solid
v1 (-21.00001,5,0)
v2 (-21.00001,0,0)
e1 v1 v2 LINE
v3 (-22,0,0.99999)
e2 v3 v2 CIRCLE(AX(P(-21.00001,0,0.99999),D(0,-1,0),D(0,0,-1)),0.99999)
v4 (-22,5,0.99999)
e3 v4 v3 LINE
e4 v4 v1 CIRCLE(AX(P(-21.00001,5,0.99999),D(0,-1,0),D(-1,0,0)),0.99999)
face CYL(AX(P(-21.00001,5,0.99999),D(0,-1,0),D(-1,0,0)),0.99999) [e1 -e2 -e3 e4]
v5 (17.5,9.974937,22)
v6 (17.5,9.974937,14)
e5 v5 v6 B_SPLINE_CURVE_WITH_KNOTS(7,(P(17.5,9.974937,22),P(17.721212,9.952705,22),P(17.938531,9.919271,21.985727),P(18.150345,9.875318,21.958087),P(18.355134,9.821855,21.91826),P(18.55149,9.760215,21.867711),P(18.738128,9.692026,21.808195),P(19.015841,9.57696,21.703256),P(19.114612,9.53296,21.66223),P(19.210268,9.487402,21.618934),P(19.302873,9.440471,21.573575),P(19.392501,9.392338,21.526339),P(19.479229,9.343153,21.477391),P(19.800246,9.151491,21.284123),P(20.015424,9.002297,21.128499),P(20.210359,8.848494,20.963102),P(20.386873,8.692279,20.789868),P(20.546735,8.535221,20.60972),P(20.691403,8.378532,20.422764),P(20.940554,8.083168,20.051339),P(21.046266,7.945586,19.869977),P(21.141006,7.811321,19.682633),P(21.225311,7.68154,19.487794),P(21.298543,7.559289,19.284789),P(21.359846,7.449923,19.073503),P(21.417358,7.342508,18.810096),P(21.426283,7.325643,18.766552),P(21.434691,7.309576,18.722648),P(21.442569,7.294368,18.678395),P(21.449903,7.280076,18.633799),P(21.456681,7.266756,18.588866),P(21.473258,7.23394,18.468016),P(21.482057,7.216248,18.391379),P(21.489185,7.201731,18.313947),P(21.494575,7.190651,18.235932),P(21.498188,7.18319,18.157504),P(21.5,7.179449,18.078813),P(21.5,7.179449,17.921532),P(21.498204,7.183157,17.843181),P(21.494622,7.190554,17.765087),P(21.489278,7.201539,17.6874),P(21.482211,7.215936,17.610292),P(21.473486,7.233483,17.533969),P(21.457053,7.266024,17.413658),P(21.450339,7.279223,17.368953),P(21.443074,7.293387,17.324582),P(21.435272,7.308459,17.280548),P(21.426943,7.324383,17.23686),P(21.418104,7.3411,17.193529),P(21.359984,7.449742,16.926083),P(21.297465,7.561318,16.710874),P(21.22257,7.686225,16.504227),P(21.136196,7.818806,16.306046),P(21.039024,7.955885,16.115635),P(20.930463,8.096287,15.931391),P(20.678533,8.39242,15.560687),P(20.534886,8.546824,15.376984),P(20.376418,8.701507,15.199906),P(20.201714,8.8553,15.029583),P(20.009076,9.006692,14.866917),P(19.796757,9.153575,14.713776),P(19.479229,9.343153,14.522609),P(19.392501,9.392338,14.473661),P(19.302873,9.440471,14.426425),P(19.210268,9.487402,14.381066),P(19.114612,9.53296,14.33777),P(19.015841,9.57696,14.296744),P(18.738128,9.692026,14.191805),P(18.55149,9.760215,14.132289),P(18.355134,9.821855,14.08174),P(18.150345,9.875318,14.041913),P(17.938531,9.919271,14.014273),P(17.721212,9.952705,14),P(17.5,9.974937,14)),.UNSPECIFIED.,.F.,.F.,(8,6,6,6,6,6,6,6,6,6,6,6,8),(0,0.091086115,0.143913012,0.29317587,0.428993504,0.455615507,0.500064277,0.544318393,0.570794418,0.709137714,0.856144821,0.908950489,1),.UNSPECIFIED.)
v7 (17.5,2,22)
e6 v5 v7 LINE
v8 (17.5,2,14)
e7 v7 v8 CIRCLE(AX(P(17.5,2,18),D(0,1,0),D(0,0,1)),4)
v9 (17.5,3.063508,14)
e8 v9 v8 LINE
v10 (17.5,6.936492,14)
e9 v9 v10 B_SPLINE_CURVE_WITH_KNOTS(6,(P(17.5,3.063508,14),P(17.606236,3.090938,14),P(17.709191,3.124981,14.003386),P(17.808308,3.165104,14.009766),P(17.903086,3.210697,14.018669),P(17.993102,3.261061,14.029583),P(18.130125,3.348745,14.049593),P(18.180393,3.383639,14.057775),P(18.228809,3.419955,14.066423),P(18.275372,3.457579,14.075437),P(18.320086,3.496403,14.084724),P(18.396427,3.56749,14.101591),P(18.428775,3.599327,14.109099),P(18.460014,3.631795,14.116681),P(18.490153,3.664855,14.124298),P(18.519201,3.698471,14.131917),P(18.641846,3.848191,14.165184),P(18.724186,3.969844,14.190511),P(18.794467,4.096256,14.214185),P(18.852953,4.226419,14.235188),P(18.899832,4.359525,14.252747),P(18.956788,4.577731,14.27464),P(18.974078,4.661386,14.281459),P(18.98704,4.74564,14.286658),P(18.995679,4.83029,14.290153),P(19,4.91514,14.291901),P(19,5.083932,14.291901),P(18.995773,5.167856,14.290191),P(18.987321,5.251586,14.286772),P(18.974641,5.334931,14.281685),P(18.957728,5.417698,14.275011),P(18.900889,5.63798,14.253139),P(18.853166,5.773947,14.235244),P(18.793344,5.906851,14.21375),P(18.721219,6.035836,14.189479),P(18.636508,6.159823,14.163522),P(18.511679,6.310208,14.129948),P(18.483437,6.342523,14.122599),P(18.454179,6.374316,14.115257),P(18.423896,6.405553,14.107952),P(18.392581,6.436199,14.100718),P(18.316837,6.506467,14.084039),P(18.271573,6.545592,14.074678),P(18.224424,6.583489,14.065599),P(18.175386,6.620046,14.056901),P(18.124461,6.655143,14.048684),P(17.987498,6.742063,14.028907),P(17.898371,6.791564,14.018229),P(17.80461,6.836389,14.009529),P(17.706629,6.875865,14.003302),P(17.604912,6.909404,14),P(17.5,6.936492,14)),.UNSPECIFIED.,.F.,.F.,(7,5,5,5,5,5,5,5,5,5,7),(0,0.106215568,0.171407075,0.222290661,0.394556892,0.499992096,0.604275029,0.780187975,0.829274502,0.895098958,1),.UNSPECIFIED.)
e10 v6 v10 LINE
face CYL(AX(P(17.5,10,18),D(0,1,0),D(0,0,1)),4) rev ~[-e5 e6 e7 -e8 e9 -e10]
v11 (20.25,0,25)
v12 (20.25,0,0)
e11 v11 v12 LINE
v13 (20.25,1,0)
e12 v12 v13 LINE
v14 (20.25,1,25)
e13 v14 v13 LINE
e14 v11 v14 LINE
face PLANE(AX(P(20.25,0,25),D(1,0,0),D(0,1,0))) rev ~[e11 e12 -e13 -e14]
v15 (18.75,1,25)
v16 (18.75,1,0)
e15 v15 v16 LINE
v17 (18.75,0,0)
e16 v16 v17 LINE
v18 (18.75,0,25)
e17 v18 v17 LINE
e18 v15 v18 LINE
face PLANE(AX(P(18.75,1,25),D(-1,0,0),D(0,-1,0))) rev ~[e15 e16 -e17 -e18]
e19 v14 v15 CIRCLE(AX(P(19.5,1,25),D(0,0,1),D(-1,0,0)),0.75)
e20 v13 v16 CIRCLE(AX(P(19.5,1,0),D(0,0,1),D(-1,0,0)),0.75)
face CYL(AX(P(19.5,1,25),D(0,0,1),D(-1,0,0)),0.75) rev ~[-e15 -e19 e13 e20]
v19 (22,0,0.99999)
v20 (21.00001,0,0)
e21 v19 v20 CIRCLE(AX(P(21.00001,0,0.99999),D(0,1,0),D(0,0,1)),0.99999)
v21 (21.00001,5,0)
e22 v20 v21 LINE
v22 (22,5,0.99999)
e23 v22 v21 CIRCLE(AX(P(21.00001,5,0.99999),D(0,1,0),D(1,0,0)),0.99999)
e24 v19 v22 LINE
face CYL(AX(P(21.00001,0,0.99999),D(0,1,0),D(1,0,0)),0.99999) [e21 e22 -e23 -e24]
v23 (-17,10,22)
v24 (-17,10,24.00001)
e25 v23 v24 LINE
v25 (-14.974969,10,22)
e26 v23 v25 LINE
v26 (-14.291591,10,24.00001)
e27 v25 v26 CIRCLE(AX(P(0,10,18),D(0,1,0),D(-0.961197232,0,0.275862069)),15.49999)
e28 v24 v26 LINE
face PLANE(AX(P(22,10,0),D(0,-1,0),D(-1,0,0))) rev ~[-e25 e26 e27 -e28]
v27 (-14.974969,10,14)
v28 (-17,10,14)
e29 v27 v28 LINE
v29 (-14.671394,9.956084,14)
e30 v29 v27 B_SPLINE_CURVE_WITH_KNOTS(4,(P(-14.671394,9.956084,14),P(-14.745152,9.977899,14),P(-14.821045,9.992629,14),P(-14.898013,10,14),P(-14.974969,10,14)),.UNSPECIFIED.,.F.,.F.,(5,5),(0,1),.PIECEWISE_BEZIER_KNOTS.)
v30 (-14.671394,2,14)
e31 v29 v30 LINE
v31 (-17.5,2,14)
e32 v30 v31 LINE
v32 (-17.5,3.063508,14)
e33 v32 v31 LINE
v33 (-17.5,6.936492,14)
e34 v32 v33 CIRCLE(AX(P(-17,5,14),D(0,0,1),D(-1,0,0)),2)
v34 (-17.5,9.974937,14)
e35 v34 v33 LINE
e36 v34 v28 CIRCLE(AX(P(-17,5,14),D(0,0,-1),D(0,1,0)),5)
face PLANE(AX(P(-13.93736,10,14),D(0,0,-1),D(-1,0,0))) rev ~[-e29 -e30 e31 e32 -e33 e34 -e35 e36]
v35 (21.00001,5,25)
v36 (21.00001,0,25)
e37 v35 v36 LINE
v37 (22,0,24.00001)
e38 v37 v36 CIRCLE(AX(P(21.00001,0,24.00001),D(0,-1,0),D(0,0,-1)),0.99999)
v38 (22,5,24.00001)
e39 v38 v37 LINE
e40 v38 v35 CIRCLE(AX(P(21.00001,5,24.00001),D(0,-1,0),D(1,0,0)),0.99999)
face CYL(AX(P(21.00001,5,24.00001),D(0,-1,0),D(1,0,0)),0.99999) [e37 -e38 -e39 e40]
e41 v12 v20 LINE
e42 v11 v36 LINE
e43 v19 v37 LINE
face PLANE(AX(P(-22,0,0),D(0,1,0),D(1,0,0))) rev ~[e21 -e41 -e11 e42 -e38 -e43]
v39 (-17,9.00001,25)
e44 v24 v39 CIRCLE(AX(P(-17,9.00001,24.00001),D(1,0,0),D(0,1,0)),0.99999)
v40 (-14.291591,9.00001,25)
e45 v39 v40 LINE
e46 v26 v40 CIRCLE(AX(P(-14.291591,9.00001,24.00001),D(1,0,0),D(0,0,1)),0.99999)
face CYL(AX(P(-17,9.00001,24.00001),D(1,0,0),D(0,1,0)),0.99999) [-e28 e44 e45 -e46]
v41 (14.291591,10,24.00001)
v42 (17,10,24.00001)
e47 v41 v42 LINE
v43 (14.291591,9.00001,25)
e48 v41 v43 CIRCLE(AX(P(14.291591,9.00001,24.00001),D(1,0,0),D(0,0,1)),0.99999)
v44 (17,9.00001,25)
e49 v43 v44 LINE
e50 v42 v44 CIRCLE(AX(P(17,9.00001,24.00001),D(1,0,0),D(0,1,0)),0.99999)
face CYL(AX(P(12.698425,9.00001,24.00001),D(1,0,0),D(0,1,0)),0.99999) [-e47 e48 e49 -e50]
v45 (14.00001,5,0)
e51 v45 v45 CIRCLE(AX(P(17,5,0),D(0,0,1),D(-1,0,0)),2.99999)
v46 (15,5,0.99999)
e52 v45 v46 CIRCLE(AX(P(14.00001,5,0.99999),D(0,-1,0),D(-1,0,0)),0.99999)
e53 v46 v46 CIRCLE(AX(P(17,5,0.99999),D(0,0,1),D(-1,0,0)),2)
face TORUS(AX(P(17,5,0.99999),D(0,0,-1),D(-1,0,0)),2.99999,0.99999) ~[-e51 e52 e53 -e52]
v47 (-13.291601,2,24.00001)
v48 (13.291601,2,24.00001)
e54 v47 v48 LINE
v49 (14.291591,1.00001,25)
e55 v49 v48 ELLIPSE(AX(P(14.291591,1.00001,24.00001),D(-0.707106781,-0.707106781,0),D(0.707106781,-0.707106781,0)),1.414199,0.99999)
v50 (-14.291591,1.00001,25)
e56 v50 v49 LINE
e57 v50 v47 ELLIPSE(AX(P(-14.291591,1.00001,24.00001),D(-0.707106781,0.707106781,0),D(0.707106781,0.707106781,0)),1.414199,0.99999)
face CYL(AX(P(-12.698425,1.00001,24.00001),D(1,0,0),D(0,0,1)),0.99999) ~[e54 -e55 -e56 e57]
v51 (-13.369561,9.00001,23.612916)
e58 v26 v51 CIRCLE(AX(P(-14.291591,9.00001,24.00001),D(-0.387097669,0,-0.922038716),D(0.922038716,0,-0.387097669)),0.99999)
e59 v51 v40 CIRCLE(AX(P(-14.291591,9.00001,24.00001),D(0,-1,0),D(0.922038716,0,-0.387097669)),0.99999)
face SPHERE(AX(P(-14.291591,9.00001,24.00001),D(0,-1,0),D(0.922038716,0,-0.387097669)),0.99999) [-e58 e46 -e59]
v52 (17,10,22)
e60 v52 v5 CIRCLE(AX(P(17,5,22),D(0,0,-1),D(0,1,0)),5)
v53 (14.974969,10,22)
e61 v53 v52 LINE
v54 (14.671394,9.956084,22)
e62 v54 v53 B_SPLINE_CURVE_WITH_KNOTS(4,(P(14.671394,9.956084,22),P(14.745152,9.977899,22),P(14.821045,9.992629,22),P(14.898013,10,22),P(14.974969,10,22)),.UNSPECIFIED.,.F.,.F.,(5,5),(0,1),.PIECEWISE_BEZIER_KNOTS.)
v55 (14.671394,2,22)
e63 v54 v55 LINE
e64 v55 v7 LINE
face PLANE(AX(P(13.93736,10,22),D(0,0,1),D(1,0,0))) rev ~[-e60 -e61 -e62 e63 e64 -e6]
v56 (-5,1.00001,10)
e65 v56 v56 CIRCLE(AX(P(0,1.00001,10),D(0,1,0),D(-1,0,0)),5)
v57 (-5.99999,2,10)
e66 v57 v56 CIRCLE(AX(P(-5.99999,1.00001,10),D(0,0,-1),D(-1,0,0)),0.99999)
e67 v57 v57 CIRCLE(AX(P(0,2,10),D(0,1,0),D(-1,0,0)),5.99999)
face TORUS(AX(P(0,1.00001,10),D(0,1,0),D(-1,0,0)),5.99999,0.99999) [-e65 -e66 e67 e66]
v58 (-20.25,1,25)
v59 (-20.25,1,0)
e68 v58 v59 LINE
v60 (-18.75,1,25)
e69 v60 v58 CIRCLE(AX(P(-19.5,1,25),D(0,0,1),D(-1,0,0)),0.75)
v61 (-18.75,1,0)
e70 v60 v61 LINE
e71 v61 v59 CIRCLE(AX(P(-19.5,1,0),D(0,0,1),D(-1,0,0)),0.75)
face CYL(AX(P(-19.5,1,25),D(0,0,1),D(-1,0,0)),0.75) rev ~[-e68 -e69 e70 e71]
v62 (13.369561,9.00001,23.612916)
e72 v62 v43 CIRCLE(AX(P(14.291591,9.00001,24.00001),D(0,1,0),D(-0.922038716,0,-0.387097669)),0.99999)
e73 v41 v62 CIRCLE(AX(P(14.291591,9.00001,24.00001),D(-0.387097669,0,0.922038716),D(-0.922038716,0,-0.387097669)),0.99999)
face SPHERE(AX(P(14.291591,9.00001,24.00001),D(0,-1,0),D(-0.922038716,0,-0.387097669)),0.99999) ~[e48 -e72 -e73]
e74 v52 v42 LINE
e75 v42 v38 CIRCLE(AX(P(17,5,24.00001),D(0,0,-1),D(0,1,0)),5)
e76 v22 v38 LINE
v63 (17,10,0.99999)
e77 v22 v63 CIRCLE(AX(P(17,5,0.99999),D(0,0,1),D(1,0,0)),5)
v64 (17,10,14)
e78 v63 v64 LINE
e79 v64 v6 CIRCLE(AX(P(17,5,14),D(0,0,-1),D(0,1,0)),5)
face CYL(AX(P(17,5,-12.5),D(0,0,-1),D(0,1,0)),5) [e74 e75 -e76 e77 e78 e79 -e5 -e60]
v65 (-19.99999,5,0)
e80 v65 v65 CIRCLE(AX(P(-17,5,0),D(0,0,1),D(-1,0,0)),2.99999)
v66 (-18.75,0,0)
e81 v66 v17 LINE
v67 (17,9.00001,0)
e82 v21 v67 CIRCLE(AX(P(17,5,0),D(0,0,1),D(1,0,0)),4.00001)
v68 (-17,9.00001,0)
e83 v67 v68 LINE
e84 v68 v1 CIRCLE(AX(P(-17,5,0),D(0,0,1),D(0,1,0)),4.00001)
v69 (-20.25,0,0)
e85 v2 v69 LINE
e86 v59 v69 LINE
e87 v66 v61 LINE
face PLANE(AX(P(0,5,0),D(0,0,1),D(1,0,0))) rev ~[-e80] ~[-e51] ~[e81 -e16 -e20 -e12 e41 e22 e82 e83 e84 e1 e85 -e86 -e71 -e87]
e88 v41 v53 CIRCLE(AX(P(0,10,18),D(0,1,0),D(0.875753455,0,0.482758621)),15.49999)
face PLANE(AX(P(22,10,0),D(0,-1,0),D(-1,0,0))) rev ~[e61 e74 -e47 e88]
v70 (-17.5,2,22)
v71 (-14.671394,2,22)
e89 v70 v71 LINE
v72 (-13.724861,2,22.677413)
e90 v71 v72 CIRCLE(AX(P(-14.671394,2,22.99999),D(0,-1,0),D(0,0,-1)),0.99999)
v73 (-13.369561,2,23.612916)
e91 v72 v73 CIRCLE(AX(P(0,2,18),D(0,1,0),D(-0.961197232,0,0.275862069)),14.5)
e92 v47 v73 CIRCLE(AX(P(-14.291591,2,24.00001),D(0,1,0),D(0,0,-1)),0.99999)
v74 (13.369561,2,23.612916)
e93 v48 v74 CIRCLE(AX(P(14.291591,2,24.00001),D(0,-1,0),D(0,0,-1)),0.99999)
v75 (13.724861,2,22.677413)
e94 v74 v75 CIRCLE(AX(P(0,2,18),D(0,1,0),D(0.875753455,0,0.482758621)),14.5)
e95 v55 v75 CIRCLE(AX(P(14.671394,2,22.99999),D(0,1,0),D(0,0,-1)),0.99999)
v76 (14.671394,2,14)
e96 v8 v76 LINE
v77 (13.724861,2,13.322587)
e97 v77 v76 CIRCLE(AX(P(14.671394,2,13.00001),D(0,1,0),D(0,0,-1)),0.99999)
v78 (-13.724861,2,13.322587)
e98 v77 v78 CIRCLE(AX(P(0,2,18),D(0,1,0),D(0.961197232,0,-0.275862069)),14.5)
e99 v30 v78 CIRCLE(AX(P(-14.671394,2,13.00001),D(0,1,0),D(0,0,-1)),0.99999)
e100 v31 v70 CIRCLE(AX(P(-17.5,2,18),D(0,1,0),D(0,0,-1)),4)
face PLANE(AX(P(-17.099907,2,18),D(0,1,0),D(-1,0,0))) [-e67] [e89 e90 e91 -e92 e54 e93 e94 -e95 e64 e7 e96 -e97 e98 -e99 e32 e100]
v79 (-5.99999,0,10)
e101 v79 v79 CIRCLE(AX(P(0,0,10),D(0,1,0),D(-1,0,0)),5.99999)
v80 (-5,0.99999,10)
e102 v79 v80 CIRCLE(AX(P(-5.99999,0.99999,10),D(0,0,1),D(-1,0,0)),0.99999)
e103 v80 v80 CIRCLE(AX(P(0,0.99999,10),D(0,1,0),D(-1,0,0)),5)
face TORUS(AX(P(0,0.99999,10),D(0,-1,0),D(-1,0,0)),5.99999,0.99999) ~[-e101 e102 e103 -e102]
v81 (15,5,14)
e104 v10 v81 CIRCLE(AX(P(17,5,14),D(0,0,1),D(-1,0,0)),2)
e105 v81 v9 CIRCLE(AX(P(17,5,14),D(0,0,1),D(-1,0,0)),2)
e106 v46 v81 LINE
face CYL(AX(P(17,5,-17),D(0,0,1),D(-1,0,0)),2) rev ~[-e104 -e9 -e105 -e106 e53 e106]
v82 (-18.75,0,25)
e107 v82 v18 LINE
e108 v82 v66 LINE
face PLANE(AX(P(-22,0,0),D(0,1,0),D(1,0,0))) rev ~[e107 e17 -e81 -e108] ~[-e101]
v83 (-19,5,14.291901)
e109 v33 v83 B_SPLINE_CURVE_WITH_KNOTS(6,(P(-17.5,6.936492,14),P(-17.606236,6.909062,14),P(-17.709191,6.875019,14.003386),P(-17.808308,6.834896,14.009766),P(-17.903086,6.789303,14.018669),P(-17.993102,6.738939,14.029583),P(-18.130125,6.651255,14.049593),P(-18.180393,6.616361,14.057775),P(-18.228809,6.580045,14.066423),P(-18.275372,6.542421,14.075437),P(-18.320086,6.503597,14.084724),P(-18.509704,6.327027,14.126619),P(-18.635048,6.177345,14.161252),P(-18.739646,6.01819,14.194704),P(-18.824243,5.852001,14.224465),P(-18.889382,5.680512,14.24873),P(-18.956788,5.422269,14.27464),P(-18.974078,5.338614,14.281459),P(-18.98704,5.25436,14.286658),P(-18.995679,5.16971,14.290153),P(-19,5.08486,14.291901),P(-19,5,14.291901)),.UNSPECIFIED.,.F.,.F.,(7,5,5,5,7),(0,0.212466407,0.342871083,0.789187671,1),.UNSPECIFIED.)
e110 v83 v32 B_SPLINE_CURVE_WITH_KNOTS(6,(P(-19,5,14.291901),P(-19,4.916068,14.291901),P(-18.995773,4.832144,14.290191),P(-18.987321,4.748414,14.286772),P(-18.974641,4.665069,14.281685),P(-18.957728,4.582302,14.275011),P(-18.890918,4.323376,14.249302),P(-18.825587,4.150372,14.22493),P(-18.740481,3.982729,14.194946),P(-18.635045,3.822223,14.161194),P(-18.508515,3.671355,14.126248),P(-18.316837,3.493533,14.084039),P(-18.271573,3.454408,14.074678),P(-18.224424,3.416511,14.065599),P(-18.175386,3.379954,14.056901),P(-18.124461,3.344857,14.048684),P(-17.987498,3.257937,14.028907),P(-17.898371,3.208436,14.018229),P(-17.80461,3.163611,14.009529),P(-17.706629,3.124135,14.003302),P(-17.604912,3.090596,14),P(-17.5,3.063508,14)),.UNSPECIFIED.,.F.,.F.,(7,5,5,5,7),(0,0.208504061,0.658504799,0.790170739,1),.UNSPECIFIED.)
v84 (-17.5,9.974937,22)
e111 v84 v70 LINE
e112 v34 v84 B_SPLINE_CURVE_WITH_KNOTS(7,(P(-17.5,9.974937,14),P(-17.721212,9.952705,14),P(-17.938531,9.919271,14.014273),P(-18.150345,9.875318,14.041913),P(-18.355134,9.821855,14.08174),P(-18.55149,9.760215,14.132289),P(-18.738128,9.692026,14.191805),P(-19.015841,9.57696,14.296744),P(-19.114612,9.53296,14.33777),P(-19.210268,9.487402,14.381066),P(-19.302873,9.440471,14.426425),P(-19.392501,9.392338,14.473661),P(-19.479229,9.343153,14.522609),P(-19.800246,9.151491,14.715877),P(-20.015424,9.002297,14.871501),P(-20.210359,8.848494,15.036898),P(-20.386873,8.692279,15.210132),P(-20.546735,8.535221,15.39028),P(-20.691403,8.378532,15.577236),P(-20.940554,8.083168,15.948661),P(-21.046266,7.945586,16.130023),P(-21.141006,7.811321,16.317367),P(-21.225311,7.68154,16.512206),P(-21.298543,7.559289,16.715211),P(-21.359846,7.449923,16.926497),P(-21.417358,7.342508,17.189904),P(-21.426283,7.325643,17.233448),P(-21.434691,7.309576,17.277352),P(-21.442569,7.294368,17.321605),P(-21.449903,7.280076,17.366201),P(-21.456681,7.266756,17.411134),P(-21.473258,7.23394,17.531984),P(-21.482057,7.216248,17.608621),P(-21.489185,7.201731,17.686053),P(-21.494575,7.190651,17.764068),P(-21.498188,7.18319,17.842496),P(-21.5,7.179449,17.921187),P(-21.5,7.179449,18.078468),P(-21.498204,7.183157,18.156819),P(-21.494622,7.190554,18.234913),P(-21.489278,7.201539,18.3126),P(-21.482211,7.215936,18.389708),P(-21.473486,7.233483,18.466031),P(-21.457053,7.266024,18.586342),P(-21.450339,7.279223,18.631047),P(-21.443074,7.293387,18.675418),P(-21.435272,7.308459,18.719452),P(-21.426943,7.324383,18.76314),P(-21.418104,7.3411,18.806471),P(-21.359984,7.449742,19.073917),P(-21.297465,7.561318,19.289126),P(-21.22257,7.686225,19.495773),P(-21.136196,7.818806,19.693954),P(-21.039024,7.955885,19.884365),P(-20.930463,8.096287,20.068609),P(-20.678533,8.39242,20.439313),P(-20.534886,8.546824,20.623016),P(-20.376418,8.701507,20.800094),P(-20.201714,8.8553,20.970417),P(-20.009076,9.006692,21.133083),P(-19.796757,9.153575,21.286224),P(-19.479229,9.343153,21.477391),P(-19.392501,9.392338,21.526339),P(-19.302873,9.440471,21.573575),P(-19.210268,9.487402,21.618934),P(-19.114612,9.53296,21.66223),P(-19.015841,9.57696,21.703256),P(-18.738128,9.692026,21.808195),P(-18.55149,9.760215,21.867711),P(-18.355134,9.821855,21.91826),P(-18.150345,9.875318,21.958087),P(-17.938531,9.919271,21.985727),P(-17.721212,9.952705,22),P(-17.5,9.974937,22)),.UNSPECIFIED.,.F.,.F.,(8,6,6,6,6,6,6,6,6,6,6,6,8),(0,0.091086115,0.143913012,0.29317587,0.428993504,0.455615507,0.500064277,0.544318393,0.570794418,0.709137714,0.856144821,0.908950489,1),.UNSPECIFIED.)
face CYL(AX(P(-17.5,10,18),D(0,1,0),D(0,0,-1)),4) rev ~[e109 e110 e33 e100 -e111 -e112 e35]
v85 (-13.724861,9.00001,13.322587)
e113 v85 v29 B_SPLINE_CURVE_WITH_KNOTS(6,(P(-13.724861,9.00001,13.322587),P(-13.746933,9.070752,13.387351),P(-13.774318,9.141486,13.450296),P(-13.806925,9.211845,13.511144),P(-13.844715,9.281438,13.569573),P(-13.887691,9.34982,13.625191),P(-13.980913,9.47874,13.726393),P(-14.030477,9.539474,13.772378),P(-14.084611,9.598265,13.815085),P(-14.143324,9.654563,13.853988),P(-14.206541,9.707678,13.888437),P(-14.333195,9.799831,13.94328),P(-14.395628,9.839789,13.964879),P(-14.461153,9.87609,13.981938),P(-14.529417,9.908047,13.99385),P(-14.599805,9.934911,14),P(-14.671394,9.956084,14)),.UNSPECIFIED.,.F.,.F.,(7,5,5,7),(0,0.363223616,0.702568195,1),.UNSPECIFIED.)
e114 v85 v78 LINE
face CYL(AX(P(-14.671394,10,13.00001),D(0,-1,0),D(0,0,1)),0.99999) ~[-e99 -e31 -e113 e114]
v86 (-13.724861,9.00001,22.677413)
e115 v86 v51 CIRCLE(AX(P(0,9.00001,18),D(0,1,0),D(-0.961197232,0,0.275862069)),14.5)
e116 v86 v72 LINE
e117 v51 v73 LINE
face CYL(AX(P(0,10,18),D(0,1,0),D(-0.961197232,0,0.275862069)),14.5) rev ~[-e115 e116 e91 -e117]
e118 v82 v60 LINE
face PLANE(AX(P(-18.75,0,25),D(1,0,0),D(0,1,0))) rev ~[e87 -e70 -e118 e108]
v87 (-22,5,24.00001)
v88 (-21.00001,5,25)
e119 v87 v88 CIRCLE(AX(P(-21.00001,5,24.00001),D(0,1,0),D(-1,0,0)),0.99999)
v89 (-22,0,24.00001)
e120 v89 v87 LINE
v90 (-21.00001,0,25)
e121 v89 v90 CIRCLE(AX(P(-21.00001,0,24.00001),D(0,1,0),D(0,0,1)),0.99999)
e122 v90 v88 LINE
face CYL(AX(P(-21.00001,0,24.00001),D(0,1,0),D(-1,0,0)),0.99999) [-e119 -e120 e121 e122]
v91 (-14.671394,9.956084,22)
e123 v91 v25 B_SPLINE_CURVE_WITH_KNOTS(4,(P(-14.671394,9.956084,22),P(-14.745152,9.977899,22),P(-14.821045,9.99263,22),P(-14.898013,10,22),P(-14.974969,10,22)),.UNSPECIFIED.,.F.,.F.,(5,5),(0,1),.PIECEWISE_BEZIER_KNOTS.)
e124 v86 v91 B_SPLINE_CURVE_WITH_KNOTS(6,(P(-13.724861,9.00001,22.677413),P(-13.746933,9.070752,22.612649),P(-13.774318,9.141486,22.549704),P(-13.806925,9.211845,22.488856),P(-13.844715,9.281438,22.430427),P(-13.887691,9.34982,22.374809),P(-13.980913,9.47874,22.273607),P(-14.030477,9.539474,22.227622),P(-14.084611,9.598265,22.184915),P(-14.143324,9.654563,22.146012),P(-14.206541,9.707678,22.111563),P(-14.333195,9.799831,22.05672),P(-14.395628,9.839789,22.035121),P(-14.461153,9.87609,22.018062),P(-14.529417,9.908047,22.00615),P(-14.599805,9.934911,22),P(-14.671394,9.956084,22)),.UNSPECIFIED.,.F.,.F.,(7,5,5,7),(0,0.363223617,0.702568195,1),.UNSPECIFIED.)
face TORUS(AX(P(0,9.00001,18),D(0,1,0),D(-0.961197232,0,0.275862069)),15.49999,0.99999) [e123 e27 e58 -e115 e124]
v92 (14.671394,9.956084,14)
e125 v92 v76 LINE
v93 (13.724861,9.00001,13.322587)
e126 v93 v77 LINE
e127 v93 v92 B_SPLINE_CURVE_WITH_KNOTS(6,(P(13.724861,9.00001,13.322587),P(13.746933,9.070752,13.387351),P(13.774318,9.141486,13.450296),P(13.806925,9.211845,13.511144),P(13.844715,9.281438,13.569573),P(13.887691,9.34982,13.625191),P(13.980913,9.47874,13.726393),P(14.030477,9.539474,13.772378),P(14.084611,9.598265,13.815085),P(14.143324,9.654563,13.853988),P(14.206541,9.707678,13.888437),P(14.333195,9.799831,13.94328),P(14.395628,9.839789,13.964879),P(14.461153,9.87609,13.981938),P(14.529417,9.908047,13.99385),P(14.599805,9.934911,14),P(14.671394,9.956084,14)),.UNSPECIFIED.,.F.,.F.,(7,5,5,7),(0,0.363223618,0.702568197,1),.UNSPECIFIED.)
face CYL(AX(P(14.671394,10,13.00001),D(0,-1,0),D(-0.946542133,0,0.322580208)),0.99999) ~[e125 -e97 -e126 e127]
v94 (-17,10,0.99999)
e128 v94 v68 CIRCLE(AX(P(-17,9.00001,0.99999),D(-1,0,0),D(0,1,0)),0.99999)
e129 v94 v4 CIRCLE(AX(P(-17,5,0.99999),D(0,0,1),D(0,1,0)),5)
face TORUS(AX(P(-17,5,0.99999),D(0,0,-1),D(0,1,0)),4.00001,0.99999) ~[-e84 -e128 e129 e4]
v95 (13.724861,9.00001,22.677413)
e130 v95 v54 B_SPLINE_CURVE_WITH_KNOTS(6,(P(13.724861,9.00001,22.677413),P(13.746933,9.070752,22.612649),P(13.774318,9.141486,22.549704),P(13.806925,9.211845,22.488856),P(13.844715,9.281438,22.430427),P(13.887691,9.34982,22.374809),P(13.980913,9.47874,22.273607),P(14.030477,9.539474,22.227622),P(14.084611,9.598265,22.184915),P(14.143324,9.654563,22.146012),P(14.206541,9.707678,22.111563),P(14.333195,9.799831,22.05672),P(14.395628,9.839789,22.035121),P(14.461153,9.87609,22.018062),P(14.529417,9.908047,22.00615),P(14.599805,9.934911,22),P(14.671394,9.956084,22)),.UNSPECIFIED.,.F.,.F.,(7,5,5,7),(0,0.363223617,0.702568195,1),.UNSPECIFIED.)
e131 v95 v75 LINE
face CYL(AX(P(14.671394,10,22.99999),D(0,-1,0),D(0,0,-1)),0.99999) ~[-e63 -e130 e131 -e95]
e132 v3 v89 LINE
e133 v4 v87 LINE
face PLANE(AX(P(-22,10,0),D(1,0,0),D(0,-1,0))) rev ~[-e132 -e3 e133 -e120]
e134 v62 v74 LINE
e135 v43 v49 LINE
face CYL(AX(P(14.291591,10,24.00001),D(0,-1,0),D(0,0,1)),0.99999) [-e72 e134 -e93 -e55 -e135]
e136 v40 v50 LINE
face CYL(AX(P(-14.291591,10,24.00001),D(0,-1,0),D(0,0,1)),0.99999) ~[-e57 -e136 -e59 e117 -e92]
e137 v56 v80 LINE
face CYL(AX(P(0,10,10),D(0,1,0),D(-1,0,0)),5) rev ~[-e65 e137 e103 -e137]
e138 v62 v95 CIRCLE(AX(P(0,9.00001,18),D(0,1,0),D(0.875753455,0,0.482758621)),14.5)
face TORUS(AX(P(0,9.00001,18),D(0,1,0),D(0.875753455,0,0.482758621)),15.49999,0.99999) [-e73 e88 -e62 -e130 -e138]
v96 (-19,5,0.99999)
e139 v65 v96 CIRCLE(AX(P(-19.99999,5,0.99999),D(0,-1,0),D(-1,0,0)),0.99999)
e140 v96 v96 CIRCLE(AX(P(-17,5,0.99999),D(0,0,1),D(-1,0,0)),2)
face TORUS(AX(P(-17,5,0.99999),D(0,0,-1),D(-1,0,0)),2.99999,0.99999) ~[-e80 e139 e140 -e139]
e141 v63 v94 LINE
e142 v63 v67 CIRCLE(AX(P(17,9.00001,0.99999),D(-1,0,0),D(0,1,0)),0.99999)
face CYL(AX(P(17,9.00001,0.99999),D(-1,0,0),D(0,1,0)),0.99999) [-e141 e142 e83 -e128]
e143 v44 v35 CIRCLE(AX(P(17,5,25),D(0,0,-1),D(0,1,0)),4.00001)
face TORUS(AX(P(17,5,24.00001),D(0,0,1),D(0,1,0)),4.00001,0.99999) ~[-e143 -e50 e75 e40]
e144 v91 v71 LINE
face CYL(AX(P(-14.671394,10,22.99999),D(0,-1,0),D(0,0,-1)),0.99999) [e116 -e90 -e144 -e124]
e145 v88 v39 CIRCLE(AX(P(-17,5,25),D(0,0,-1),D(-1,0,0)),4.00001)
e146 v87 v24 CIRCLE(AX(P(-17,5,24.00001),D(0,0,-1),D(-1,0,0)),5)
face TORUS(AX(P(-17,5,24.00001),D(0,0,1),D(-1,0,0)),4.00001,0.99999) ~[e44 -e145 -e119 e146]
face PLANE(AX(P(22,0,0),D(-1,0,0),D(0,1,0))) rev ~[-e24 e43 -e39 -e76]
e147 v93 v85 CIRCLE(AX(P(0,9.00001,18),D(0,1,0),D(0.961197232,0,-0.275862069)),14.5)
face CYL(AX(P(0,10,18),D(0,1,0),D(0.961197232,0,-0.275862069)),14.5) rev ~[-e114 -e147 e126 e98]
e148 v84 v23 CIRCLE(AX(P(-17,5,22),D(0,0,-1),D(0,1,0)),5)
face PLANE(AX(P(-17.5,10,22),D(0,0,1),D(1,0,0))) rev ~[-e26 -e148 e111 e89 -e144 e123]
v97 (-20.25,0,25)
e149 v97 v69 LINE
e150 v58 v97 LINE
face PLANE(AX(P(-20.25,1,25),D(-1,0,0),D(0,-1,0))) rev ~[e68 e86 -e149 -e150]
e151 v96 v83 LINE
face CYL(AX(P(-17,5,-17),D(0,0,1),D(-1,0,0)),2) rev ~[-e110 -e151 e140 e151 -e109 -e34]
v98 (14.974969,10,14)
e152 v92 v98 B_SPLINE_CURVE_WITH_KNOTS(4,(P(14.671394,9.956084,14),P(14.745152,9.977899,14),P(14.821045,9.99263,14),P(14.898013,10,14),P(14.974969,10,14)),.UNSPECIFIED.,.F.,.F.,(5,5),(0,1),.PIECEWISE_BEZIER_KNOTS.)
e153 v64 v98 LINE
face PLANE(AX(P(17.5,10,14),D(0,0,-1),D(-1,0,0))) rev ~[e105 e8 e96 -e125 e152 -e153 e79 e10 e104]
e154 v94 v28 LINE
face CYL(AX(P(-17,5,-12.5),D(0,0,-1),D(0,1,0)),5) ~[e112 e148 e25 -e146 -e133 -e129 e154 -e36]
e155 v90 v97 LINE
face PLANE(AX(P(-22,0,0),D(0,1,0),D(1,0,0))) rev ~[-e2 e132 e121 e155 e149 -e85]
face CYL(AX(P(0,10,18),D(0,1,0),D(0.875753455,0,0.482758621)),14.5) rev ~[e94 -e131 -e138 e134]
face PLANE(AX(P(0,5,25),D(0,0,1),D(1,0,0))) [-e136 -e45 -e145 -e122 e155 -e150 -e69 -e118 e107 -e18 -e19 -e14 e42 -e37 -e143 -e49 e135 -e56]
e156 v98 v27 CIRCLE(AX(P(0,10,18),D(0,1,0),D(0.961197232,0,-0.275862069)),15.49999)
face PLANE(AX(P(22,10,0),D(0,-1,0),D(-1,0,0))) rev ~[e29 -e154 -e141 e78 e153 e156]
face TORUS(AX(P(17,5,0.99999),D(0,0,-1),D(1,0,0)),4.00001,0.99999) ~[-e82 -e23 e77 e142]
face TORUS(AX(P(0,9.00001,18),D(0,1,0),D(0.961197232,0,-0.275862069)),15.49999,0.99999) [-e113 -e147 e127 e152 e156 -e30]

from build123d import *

# Parameters (mm, degrees)
F1_DEPTH    = 25
F2_D        = 4
F2_DEPTH    = 17
F2_TIP      = 1.2017212381
F3_R        = 5
F4_DEPTH    = 10.001
F3_R_2      = 2.075
F5_DEPTH    = 8
F6_T1_DEPTH = 50
F8_DEPTH    = 25.0010001
F9_R        = 0.99999


# Not quite as in the source:
# - a fillet or chamfer that OpenCascade refuses, or shapes differently, is made with other operations: its cross-section is extruded or revolved along the edge and cut away or added
# - a fillet or chamfer is up to 0.001 mm smaller than in the source, because OpenCascade refuses the exact size


with BuildPart() as f1:
    # F0 (on Top) → F1 (new body)
    with BuildSketch(Plane.XY):
        Polygon((22, 10), (0, 10), (-22, 10), (-22, 0), (-17, 0), (0, 0), (17, 0), (22, 0), align=None)
    extrude(amount=F1_DEPTH)

    # F2
    with Locations(Plane(origin=(0, 0, 0), x_dir=(1, 0, 0), z_dir=(0, 0, -1))):
        with Locations((-17, -5), (17, -5)):
            Hole(F2_D / 2, depth=F2_DEPTH)
            with Locations((0, 0, -(F2_DEPTH + F2_TIP / 2))):  # 118° drill point
                Cone(0, F2_D / 2, F2_TIP, mode=Mode.SUBTRACT)

    # F3 (on face) → F4 (cut, through all)
    with BuildSketch(Plane(origin=(0, 10, 0), x_dir=(-1, 0, 0), z_dir=(0, 1, 0))):
        with Locations((0, 10)):
            Circle(F3_R)
    extrude(amount=-F4_DEPTH, mode=Mode.SUBTRACT)

    # F3 (on face) → F5 (cut)
    with BuildSketch(Plane(origin=(0, 10, 0), x_dir=(-1, 0, 0), z_dir=(0, 1, 0))):
        with BuildLine():
            ThreePointArc((13.9373598648, 22), (14.3586510167, 20.0196883375), (14.5, 18))
            ThreePointArc((14.5, 18), (14.3586510167, 15.9803116625), (13.9373598648, 14))
            Line((13.9373598648, 14), (17.5, 14))
            ThreePointArc((17.5, 14), (21.5, 18), (17.5, 22))
            Line((17.5, 22), (13.9373598648, 22))
        make_face()
        with Locations((17.5, 18)):
            Circle(F3_R_2, mode=Mode.SUBTRACT)
        with BuildLine():
            ThreePointArc((13.9373598648, 14), (14.3586510167, 15.9803116625), (14.5, 18))
            ThreePointArc((14.5, 18), (14.3586510167, 20.0196883375), (13.9373598648, 22))
            ThreePointArc((13.9373598648, 22), (13.4020990954, 23.5347755003), (12.6984250992, 25))
            Line((12.6984250992, 25), (-12.6984250992, 25))
            ThreePointArc((-12.6984250992, 25), (-13.4020990954, 23.5347755003), (-13.9373598648, 22))
            ThreePointArc((-13.9373598648, 22), (-14.5, 18), (-13.9373598648, 14))
            ThreePointArc((-13.9373598648, 14), (0, 3.5), (13.9373598648, 14))
        make_face()
        with Locations((0, 10)):
            Circle(F3_R, mode=Mode.SUBTRACT)
        with BuildLine():
            Line((-17.5, 14), (-13.9373598648, 14))
            ThreePointArc((-13.9373598648, 14), (-14.5, 18), (-13.9373598648, 22))
            Line((-13.9373598648, 22), (-17.5, 22))
            ThreePointArc((-17.5, 22), (-21.5, 18), (-17.5, 14))
        make_face()
        with Locations((-17.5, 18)):
            Circle(F3_R_2, mode=Mode.SUBTRACT)
        with Locations((17.5, 18)):
            Circle(F3_R_2)
        with Locations((-17.5, 18)):
            Circle(F3_R_2)
    extrude(amount=-F5_DEPTH, mode=Mode.SUBTRACT)

    # F6: fillet of radius 5 on 2 edges, made by hand

    # F6_s2 → F6_t1 (cut)
    with BuildSketch(Plane.XY.offset(-12.5)):
        with BuildLine():
            ThreePointArc((-17, 10), (-20.5355339059, 8.5355339059), (-22, 5))
            Line((-22, 5), (-22, 10))
            Line((-22, 10), (-17, 10))
        make_face()
        with BuildLine():
            ThreePointArc((17, 10), (20.5355339059, 8.5355339059), (22, 5))
            Line((22, 5), (22, 10))
            Line((22, 10), (17, 10))
        make_face()
    extrude(amount=F6_T1_DEPTH, mode=Mode.SUBTRACT)

    # F7 (on face) → F8 (cut, through all)
    with BuildSketch(Plane.XY.offset(25)):
        with BuildLine():
            ThreePointArc((-18.75, 1), (-19.5, 1.75), (-20.25, 1))
            Line((-20.25, 1), (-18.75, 1))
        make_face()
        with BuildLine():
            Line((-18.75, 1), (-20.25, 1))
            ThreePointArc((-20.25, 1), (-19.5, 0.25), (-18.75, 1))
        make_face()
        with BuildLine():
            Line((-20.25, 1), (-20.25, 0))
            Line((-20.25, 0), (-18.75, 0))
            Line((-18.75, 0), (-18.75, 1))
            ThreePointArc((-18.75, 1), (-19.5, 0.25), (-20.25, 1))
        make_face()
        with BuildLine():
            ThreePointArc((20.25, 1), (19.5, 1.75), (18.75, 1))
            ThreePointArc((18.75, 1), (19.5, 0.25), (20.25, 1))
        make_face()
        with BuildLine():
            Line((18.75, 1), (18.75, 0))
            Line((18.75, 0), (20.25, 0))
            Line((20.25, 0), (20.25, 1))
            ThreePointArc((20.25, 1), (19.5, 0.25), (18.75, 1))
        make_face()
    extrude(amount=-F8_DEPTH, mode=Mode.SUBTRACT)

    # F9 (radius 1 in the source; OpenCascade refuses exactly that, so slightly less here)
    f9_edges = [f1.edges().sort_by_distance(p)[0] for p in [
        (5, 0, 10),
        (5, 2, 10),
        (0, 10, 3.5),
        (13.402099, 10, 23.534776),
        (-13.402099, 10, 23.534776),
        (0, 10, 0),
        (20.535534, 8.535534, 25),
        (-20.535534, 8.535534, 25),
        (13.93736, 6, 22),
        (13.93736, 6, 14),
        (-13.93736, 6, 14),
        (-13.93736, 6, 22),
        (-12.698425, 6, 25),
        (12.698425, 6, 25),
        (0, 2, 25),
        (20.535534, 8.535534, 0),
        (22, 2.5, 0),
        (-22, 2.5, 0),
        (-20.535534, 8.535534, 0),
        (-19, 5, 0),
        (15, 5, 0),
        (22, 2.5, 25),
        (-22, 2.5, 25),
        (-14.849213, 10, 25),
        (14.849213, 10, 25),
    ]]
    fillet(f9_edges, radius=F9_R)


solid = f1.part
